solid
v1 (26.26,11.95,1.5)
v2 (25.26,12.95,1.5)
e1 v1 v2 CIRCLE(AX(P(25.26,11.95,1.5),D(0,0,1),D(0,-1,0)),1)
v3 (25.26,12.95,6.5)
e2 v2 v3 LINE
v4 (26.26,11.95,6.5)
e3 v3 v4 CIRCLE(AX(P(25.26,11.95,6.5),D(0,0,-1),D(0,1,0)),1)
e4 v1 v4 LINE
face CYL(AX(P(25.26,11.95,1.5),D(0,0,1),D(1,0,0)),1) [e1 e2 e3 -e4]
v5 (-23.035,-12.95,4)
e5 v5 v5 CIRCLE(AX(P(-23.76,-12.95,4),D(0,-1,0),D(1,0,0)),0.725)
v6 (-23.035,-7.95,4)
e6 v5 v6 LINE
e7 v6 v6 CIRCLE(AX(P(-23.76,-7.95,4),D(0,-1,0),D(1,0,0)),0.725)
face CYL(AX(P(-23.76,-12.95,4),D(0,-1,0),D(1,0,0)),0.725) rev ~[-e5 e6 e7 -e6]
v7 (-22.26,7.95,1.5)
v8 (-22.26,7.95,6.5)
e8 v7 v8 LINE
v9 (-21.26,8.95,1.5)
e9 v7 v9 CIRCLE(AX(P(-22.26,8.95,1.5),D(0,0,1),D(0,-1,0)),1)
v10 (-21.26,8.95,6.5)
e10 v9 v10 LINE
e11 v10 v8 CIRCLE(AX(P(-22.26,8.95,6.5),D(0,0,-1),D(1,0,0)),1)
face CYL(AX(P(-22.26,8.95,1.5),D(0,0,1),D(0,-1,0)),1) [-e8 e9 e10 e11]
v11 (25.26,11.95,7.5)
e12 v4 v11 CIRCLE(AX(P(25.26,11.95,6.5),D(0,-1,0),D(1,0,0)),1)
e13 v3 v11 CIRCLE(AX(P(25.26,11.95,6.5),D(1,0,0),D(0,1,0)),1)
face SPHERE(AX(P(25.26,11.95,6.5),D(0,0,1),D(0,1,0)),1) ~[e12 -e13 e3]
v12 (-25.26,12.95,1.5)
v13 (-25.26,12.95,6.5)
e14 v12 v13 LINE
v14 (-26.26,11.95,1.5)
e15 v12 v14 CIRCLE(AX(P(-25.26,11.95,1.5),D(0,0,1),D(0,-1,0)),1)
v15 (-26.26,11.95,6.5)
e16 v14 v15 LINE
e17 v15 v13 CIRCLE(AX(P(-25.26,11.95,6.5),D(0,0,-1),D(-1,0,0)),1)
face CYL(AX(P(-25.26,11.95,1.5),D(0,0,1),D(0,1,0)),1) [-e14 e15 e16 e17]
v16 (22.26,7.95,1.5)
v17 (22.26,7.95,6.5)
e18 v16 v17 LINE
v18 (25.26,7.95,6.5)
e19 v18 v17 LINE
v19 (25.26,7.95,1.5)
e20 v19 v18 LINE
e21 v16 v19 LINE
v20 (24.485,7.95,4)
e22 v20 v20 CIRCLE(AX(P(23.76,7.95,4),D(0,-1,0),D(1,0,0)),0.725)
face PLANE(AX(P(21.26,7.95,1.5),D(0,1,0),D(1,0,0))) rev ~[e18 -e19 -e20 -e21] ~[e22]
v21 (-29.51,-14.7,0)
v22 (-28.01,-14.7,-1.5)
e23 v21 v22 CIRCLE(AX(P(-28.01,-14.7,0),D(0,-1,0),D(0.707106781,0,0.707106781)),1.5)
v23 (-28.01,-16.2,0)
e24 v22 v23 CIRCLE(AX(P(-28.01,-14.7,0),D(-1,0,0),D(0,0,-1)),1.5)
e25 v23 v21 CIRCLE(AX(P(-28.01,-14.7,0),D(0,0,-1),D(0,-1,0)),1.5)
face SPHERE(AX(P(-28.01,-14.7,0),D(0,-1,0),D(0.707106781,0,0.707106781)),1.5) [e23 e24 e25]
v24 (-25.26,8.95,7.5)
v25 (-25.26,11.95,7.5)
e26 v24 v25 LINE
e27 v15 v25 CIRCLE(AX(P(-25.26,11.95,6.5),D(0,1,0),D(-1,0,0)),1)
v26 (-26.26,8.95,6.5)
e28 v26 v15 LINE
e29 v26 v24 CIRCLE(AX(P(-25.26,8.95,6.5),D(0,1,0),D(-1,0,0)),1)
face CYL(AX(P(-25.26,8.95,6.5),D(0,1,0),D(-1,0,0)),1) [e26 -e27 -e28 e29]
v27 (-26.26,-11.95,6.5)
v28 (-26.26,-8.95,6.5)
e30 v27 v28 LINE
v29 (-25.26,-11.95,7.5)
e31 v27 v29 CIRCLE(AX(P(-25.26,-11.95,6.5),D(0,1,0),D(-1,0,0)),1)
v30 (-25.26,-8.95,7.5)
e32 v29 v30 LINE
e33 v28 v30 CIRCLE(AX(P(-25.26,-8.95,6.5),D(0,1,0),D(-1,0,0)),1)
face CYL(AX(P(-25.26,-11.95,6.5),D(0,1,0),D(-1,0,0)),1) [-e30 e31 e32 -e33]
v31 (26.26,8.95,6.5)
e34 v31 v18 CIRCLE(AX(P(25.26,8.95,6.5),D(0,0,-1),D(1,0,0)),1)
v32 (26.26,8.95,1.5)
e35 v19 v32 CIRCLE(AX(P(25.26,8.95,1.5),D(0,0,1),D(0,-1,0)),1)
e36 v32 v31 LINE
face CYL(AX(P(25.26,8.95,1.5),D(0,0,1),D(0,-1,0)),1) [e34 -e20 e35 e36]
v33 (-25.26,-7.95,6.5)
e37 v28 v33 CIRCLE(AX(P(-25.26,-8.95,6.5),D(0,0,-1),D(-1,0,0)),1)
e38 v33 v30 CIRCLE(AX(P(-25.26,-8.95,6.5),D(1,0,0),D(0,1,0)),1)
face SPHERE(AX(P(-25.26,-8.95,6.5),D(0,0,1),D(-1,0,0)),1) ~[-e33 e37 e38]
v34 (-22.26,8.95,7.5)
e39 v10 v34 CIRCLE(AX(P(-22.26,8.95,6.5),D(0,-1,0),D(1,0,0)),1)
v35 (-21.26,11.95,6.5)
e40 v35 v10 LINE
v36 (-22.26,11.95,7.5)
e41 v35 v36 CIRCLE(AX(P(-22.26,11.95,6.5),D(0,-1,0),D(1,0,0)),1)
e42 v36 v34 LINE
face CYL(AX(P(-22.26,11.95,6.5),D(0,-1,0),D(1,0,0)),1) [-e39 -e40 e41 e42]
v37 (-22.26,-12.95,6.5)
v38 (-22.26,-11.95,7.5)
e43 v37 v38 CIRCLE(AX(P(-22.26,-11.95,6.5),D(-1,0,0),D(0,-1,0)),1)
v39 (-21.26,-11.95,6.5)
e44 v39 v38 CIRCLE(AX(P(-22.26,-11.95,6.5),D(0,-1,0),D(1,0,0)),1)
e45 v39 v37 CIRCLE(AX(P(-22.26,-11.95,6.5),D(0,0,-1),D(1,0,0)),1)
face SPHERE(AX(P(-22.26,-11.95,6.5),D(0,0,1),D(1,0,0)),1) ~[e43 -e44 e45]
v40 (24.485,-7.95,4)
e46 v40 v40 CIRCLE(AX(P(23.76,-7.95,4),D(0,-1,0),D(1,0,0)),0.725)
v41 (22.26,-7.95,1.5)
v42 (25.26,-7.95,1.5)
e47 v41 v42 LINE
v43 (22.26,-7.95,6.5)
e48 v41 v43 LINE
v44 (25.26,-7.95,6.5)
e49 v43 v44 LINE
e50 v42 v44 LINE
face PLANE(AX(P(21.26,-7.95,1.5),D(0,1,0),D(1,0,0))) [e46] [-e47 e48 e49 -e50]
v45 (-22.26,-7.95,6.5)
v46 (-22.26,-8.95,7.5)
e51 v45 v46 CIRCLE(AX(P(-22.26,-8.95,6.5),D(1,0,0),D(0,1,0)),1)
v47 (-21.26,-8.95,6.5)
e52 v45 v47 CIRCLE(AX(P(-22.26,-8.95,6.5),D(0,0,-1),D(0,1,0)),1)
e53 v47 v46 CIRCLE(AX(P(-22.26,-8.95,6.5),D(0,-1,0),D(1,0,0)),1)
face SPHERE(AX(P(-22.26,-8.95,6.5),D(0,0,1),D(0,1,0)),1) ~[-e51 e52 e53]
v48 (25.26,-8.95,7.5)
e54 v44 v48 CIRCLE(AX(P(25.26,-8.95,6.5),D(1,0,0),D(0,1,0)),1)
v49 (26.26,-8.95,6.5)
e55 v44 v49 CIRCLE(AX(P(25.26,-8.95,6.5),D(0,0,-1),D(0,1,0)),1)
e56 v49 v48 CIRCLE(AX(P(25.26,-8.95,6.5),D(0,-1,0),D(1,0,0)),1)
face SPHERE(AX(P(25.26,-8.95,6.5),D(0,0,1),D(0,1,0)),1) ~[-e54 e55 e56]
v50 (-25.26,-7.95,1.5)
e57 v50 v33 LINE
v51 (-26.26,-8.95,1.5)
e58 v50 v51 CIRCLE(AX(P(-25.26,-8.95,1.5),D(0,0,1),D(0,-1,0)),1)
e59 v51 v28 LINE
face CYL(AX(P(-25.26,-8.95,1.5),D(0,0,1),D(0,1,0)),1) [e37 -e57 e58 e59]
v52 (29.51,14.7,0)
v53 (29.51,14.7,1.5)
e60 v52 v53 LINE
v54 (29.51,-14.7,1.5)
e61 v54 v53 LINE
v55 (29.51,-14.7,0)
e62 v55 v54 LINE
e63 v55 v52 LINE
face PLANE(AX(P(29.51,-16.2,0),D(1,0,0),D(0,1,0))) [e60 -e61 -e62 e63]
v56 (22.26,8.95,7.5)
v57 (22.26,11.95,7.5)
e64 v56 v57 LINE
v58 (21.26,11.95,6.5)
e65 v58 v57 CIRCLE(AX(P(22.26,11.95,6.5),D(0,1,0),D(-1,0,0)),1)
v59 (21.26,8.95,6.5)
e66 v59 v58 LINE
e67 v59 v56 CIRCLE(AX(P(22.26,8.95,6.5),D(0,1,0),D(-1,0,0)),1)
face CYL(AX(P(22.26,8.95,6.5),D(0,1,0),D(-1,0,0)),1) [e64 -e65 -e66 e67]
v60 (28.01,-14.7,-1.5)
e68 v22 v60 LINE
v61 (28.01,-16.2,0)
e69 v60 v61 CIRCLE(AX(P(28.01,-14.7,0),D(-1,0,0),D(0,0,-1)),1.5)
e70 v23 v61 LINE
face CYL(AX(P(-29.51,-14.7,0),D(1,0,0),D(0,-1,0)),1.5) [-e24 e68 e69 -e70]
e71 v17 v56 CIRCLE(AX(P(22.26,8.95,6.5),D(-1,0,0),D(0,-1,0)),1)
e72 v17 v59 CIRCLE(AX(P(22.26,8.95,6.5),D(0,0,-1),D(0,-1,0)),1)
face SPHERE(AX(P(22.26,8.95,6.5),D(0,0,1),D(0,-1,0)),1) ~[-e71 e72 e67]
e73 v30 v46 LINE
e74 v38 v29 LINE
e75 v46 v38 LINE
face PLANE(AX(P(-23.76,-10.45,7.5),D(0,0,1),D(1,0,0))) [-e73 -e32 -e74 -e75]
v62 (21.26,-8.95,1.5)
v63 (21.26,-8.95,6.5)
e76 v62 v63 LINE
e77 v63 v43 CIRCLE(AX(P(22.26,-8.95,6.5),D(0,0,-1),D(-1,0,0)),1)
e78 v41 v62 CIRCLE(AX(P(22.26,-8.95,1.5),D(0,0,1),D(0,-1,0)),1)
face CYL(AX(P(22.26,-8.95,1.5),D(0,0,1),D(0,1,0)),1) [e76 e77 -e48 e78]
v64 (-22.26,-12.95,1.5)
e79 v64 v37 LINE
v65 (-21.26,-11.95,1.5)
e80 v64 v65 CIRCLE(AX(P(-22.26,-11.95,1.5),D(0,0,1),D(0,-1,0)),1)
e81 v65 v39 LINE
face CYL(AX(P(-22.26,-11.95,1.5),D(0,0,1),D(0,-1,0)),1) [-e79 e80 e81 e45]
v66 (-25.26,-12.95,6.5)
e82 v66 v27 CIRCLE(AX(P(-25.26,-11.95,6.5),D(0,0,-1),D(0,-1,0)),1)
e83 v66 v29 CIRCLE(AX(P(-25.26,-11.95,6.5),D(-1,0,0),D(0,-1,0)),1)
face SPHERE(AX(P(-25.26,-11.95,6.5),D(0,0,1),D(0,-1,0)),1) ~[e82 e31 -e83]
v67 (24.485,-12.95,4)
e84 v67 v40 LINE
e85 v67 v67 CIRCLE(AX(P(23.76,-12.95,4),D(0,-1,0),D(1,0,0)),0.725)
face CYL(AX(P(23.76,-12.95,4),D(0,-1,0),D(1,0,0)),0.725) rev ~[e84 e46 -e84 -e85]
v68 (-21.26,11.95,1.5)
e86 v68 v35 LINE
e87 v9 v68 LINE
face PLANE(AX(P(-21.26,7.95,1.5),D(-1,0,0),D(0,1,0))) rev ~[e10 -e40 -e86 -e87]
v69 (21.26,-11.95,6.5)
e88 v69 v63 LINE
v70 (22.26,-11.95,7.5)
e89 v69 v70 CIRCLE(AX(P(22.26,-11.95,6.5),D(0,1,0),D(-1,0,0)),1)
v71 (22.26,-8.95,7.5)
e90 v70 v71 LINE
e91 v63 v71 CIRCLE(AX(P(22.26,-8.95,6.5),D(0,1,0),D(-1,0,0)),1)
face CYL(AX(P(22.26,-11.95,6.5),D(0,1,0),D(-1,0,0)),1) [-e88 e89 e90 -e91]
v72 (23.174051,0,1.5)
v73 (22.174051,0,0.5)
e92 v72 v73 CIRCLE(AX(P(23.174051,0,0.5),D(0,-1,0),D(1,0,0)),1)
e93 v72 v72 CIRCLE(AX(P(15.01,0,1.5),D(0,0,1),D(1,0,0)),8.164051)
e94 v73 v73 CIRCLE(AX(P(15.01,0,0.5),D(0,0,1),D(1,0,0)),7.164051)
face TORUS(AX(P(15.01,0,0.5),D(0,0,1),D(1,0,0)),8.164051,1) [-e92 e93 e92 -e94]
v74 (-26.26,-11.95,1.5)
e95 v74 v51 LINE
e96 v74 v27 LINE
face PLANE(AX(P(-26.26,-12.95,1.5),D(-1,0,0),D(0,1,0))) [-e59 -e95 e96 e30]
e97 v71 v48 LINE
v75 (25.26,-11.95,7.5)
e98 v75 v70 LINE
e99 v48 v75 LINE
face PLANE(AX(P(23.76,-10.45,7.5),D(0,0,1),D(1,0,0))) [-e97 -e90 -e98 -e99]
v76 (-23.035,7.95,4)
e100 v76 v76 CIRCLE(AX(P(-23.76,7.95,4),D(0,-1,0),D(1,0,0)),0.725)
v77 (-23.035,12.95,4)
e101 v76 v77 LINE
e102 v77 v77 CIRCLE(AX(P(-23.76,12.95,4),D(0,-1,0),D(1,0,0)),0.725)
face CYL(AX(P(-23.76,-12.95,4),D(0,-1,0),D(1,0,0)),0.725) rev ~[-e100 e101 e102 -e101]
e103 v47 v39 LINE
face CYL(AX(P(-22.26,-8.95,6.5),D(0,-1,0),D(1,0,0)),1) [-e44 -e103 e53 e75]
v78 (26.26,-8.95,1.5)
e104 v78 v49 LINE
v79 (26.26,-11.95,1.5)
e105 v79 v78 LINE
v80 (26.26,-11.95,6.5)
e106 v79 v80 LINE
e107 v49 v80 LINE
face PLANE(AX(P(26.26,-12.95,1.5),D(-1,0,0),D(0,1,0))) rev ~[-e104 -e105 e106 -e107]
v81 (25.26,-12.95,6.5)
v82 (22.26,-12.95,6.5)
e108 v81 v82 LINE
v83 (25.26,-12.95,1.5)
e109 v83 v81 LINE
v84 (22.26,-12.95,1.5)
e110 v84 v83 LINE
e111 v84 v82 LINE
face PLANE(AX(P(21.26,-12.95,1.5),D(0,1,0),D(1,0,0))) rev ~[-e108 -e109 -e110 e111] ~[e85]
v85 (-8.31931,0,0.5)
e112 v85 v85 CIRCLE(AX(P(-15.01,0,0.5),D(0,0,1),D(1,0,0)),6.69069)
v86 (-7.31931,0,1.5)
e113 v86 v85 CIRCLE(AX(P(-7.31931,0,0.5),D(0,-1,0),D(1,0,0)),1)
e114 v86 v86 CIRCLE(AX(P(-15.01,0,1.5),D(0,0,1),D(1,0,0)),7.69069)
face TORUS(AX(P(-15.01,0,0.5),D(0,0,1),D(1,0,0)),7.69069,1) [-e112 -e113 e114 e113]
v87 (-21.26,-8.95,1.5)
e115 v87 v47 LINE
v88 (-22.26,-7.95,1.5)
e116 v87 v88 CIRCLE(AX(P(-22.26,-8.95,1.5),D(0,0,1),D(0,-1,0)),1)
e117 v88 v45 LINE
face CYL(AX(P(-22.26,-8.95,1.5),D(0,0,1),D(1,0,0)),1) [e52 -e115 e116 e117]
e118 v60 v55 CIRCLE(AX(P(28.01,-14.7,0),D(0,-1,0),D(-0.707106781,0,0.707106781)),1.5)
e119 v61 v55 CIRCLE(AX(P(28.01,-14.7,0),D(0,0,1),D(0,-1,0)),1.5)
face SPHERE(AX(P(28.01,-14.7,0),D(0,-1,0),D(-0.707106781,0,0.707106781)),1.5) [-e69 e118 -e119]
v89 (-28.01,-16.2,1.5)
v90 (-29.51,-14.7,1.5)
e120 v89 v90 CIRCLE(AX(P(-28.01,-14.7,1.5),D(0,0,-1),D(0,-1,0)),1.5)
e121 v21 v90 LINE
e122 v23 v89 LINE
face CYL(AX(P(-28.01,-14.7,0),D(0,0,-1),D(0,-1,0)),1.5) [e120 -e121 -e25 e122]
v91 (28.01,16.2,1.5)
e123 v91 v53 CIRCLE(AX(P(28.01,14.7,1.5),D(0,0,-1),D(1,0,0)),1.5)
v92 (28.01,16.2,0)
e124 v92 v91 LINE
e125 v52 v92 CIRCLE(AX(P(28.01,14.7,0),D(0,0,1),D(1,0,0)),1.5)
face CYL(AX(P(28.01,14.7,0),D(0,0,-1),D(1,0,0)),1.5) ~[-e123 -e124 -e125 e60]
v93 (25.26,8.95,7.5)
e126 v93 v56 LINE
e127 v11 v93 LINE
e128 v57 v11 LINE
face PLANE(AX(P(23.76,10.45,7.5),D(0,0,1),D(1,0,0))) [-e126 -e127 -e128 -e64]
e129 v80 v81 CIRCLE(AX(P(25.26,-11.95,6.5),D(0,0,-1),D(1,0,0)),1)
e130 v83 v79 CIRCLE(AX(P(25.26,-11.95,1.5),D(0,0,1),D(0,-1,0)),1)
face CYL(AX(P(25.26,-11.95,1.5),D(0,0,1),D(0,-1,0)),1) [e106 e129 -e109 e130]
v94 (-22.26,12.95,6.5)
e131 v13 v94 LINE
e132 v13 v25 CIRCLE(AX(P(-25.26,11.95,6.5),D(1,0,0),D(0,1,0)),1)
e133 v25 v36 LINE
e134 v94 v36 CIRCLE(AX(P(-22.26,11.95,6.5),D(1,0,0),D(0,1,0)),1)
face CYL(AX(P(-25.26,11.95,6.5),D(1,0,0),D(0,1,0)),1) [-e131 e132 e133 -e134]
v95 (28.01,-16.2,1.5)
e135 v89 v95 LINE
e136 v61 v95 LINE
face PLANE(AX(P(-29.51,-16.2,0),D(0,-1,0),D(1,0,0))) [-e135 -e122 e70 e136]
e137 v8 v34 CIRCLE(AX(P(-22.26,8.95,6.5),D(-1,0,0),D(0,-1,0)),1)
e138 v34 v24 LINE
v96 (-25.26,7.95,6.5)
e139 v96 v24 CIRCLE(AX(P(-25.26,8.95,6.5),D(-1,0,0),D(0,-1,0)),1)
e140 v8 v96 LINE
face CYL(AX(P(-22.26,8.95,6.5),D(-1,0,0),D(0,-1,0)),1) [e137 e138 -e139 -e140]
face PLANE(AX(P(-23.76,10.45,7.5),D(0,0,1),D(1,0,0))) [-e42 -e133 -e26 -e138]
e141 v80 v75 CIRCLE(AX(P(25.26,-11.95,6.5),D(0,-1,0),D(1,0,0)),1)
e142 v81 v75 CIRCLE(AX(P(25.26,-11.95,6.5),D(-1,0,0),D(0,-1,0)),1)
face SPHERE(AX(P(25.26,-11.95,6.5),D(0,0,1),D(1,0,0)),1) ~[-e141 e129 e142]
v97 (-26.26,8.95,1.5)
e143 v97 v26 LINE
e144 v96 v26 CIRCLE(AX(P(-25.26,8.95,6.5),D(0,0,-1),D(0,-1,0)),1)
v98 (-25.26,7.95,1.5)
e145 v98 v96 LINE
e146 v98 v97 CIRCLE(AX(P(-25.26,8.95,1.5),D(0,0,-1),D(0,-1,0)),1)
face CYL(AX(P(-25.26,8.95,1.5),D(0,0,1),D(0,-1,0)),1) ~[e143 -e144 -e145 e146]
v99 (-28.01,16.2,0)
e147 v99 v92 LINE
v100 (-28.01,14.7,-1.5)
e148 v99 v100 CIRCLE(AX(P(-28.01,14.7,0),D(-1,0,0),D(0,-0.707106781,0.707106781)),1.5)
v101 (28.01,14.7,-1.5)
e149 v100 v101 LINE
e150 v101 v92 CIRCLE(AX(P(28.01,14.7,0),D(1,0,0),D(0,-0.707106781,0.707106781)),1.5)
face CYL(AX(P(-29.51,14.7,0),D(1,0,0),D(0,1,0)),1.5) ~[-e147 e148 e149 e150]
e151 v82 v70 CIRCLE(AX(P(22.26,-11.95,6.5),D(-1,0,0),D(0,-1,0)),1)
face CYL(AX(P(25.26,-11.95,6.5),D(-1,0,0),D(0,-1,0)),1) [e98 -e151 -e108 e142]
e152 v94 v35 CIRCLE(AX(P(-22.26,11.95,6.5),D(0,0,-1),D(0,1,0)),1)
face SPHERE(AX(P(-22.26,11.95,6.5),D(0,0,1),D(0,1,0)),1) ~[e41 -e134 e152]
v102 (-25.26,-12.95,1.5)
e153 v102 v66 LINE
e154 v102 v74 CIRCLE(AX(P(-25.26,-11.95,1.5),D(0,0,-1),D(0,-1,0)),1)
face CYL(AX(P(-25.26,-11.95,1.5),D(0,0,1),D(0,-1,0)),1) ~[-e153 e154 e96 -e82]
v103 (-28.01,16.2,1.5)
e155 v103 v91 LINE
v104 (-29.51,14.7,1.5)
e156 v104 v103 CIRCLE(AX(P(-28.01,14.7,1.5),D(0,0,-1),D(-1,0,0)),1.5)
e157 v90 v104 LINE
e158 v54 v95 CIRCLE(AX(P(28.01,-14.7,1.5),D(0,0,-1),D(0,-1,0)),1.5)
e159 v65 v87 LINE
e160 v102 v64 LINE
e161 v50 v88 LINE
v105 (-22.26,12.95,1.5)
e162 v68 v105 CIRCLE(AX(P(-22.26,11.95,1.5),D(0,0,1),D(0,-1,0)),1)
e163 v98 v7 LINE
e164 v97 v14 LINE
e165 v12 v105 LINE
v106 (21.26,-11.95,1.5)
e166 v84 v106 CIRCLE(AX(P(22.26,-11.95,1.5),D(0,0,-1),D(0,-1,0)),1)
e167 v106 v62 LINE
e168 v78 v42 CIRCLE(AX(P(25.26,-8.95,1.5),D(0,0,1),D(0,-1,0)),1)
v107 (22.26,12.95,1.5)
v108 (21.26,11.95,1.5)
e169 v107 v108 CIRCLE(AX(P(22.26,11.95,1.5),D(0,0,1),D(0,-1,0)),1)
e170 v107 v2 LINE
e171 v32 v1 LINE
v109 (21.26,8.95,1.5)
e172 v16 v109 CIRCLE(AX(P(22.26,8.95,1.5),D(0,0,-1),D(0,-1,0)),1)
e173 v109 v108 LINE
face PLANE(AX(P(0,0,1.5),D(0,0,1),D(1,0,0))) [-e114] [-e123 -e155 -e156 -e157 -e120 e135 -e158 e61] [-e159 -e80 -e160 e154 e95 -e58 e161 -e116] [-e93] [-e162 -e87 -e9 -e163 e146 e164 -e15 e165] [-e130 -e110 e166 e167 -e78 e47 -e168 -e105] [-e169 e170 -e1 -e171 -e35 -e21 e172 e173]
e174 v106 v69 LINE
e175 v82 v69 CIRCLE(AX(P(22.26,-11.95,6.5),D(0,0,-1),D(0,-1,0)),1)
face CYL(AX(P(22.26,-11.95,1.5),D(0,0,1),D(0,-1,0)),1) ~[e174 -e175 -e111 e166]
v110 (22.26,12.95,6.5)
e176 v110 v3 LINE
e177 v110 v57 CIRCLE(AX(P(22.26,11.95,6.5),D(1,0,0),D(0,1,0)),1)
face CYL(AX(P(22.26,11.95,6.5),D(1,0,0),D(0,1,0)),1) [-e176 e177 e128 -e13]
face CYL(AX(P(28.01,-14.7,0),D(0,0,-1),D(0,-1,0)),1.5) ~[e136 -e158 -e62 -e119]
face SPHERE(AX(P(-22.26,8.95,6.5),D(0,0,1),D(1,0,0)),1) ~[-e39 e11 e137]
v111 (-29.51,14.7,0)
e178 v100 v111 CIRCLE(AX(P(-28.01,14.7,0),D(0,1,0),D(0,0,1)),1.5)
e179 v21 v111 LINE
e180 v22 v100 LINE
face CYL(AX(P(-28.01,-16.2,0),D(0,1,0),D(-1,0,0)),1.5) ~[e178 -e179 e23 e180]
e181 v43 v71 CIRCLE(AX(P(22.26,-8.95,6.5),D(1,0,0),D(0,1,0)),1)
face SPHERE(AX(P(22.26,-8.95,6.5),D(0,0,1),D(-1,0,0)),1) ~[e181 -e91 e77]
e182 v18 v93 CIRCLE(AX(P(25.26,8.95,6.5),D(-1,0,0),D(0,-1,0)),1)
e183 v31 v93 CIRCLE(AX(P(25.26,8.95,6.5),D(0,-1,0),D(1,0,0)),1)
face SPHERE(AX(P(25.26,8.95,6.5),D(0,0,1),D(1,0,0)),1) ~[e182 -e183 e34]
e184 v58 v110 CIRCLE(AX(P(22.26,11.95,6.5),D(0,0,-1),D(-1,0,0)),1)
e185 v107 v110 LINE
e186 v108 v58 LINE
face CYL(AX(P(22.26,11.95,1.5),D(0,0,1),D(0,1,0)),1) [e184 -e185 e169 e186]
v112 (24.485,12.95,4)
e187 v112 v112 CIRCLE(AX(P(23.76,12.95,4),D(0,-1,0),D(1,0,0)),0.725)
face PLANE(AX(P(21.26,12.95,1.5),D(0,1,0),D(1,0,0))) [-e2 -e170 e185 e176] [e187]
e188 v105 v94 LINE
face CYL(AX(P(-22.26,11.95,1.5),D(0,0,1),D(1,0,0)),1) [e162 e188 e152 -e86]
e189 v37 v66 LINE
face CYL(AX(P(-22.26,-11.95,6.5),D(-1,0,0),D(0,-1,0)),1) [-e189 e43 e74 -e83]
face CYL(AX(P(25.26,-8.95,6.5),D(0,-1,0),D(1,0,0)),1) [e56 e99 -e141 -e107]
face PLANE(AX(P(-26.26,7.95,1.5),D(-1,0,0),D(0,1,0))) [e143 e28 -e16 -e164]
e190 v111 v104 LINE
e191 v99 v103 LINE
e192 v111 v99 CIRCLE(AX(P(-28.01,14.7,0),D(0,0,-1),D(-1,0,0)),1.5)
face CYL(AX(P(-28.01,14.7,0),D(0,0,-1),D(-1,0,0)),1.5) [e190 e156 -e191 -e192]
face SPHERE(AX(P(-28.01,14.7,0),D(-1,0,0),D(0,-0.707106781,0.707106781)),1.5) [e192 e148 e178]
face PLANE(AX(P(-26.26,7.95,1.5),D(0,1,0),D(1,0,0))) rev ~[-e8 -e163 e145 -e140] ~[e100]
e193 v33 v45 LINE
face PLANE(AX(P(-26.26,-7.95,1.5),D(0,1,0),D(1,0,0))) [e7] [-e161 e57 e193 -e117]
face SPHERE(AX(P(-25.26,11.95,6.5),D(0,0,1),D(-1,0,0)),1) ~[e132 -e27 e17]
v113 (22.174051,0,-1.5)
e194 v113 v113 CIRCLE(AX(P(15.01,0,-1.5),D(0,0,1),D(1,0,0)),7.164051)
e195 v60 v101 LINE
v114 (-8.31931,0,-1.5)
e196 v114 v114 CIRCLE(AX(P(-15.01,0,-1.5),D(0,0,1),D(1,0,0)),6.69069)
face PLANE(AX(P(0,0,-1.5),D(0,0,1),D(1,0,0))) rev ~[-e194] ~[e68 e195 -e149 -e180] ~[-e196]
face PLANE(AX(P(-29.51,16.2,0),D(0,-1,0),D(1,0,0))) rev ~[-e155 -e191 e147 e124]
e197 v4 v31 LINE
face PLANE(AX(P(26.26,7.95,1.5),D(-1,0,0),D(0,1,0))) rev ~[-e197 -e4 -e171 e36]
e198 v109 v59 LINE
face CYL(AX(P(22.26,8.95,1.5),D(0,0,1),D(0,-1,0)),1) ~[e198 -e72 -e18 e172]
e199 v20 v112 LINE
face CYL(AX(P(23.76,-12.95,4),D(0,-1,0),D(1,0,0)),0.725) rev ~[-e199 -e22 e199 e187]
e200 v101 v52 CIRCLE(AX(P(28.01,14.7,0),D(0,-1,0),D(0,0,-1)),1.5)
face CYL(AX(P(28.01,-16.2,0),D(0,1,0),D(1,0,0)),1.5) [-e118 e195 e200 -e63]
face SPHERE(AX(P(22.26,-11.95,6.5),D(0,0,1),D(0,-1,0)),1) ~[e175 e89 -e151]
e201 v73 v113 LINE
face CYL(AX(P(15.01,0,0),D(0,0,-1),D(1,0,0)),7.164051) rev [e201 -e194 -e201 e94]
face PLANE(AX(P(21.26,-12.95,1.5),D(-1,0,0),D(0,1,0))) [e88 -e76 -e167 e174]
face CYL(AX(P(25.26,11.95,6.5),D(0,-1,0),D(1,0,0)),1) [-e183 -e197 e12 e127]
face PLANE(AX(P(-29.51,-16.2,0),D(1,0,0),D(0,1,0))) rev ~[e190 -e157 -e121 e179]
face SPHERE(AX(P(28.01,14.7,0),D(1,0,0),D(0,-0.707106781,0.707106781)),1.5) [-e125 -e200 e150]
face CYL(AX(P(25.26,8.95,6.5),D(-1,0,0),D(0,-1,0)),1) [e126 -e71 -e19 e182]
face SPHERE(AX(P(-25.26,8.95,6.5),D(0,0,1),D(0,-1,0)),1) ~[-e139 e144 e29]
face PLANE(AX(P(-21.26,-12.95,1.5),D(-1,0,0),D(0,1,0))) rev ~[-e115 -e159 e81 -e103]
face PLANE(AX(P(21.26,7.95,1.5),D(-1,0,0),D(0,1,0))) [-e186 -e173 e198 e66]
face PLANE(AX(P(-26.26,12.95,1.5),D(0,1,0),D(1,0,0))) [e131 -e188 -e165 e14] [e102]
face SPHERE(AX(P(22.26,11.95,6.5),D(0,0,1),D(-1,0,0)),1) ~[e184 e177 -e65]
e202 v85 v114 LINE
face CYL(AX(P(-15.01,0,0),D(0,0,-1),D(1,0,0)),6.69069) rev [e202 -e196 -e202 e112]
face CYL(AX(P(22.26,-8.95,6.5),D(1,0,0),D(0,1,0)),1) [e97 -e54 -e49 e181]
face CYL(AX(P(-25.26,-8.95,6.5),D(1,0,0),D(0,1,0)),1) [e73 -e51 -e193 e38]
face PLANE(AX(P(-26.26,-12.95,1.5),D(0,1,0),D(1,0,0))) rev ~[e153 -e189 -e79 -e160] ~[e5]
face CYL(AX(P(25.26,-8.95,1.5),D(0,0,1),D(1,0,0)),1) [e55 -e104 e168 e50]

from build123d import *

# Parameters (mm, degrees)
F0_W         = 59.02
F0_H         = 32.4
F0_R         = 6.6906896399
F0_R_2       = 7.1640506352
F1_DEPTH     = 1.5
F2_W         = 5
F2_H         = 5
F3_DEPTH     = 6
F4_R         = 1
F5_R         = 1
F6_R         = 1.5
F7_T1_DEPTH  = 5.25
F7_S5_W      = 1.5
F7_S5_H      = 1.5
F7_T6_DEPTH  = 1.5
F7_S11_W     = 1.5
F7_S11_H     = 1.5
F7_T12_DEPTH = 1.5
F7_S17_W     = 1.5
F7_S17_H     = 1.5
F7_T18_DEPTH = 1.5
F7_S23_W     = 1.5
F7_S23_H     = 1.5
F7_T24_DEPTH = 1.5
F8_R         = 0.725
F9_DEPTH     = 35
F10_R        = 0.725
F11_DEPTH    = 35


# Not quite as in the source:
# - a fillet or chamfer that OpenCascade refuses, or shapes differently, is made with other operations: its cross-section is extruded or revolved along the edge and cut away or added


with BuildPart() as f1:
    # F0 (on Top) → F1 (new body, symmetric)
    with BuildSketch(Plane.XY):
        Rectangle(F0_W, F0_H)
        with Locations((-15.01, 0)):
            Circle(F0_R, mode=Mode.SUBTRACT)
        with Locations((15.01, 0)):
            Circle(F0_R_2, mode=Mode.SUBTRACT)
    extrude(amount=F1_DEPTH, both=True)

    # F2 (on face) → F3 (join)
    with BuildSketch(Plane.XY.offset(1.5)):
        with Locations((-23.76, -10.45)):
            Rectangle(F2_W, F2_H)
        with Locations((-23.76, 10.45)):
            Rectangle(F2_W, F2_H)
        with Locations((23.76, 10.45)):
            Rectangle(F2_W, F2_H)
        with Locations((23.76, -10.45)):
            Rectangle(F2_W, F2_H)
    extrude(amount=F3_DEPTH)

    # F4
    f4_edges = [f1.edges().sort_by_distance(p)[0] for p in [
        (26.26, -12.95, 4.5),
        (26.26, -7.95, 4.5),
        (26.26, 7.95, 4.5),
        (26.26, 12.95, 4.5),
        (21.26, -12.95, 4.5),
        (21.26, -7.95, 4.5),
        (-21.26, -12.95, 4.5),
        (-26.26, -12.95, 4.5),
        (-26.26, -7.95, 4.5),
        (-26.26, 7.95, 4.5),
        (-21.26, 7.95, 4.5),
        (21.26, 12.95, 4.5),
        (21.26, 7.95, 4.5),
        (-26.26, 12.95, 4.5),
        (-21.26, 12.95, 4.5),
        (-21.26, -7.95, 4.5),
    ]]
    fillet(f4_edges, radius=F4_R)

    # F5
    f5_edges = [f1.edges().sort_by_distance(p)[0] for p in [
        (-23.76, -7.95, 7.5),
        (-21.552893, -8.242893, 7.5),
        (-25.967107, -8.242893, 7.5),
        (-21.26, -10.45, 7.5),
        (-26.26, -10.45, 7.5),
        (-21.552893, -12.657107, 7.5),
        (-25.967107, -12.657107, 7.5),
        (-23.76, -12.95, 7.5),
        (-23.76, 12.95, 7.5),
        (-21.552893, 12.657107, 7.5),
        (-25.967107, 12.657107, 7.5),
        (-21.26, 10.45, 7.5),
        (-26.26, 10.45, 7.5),
        (-21.552893, 8.242893, 7.5),
        (-25.967107, 8.242893, 7.5),
        (-23.76, 7.95, 7.5),
        (23.76, 12.95, 7.5),
        (25.967107, 12.657107, 7.5),
        (21.552893, 12.657107, 7.5),
        (26.26, 10.45, 7.5),
        (21.26, 10.45, 7.5),
        (25.967107, 8.242893, 7.5),
        (21.552893, 8.242893, 7.5),
        (23.76, 7.95, 7.5),
        (23.76, -7.95, 7.5),
        (25.967107, -8.242893, 7.5),
        (21.552893, -8.242893, 7.5),
        (26.26, -10.45, 7.5),
        (21.26, -10.45, 7.5),
        (25.967107, -12.657107, 7.5),
        (21.552893, -12.657107, 7.5),
        (23.76, -12.95, 7.5),
        (7.845949, 0, 1.5),
        (-21.70069, 0, 1.5),
    ]]
    fillet(f5_edges, radius=F5_R)

    # F6
    f6_edges = [f1.edges().sort_by_distance(p)[0] for p in [
        (0, 16.2, -1.5),
        (-29.51, 0, -1.5),
        (0, -16.2, -1.5),
        (29.51, 0, -1.5),
    ]]
    fillet(f6_edges, radius=F6_R)

    # F7: fillet of radius 1.5 on 4 edges, made by hand

    # F7_s2 → F7_t1 (cut)
    with BuildSketch(Plane.XY):
        with BuildLine():
            ThreePointArc((29.51, 14.7), (29.0706601718, 15.7606601718), (28.01, 16.2))
            Line((28.01, 16.2), (29.51, 16.2))
            Line((29.51, 16.2), (29.51, 14.7))
        make_face()
        with BuildLine():
            ThreePointArc((-29.51, 14.7), (-29.0706601718, 15.7606601718), (-28.01, 16.2))
            Line((-28.01, 16.2), (-29.51, 16.2))
            Line((-29.51, 16.2), (-29.51, 14.7))
        make_face()
        with BuildLine():
            ThreePointArc((-28.01, -16.2), (-29.0706601718, -15.7606601718), (-29.51, -14.7))
            Line((-29.51, -14.7), (-29.51, -16.2))
            Line((-29.51, -16.2), (-28.01, -16.2))
        make_face()
        with BuildLine():
            ThreePointArc((28.01, -16.2), (29.0706601718, -15.7606601718), (29.51, -14.7))
            Line((29.51, -14.7), (29.51, -16.2))
            Line((29.51, -16.2), (28.01, -16.2))
        make_face()
    extrude(amount=F7_T1_DEPTH, mode=Mode.SUBTRACT)


with BuildPart() as f7_tool4:
    # F7_s5 → F7_t6 (new body)
    with BuildSketch(Plane.XZ.offset(14.7)):
        with Locations((28.76, -0.75)):
            Rectangle(F7_S5_W, F7_S5_H)
    extrude(amount=F7_T6_DEPTH)

    # F7_s7 → F7_t8 (revolve, cut)
    with BuildSketch(Plane(origin=(28.01, -14.7, 0), x_dir=(-0.7071067812, 0, 0.7071067812), z_dir=(0.7071067812, 0, 0.7071067812))):
        with BuildLine():
            ThreePointArc((0, -1.5), (1.5, 0), (0, 1.5))
            Line((0, 1.5), (0, -1.5))
        make_face()
    revolve(axis=Axis((28.01, -14.7, 0), (0, -1, 0)), mode=Mode.SUBTRACT)


with BuildPart() as f1_1:
    add(f1.part)

    # F7_t3: cut F7_tool4
    add(f7_tool4.part, mode=Mode.SUBTRACT)


with BuildPart() as f7_tool10:
    # F7_s11 → F7_t12 (new body)
    with BuildSketch(Plane.XZ.offset(14.7)):
        with Locations((-28.76, -0.75)):
            Rectangle(F7_S11_W, F7_S11_H)
    extrude(amount=F7_T12_DEPTH)

    # F7_s13 → F7_t14 (revolve, cut)
    with BuildSketch(Plane(origin=(-28.01, -14.7, 0), x_dir=(0.7071067812, 0, 0.7071067812), z_dir=(0.7071067812, 0, -0.7071067812))):
        with BuildLine():
            ThreePointArc((0, -1.5), (1.5, 0), (0, 1.5))
            Line((0, 1.5), (0, -1.5))
        make_face()
    revolve(axis=Axis((-28.01, -14.7, 0), (0, -1, 0)), mode=Mode.SUBTRACT)


with BuildPart() as f1_2:
    add(f1_1.part)

    # F7_t9: cut F7_tool10
    add(f7_tool10.part, mode=Mode.SUBTRACT)


with BuildPart() as f7_tool16:
    # F7_s17 → F7_t18 (new body)
    with BuildSketch(Plane.YZ.offset(-28.01)):
        with Locations((15.45, -0.75)):
            Rectangle(F7_S17_W, F7_S17_H)
    extrude(amount=-F7_T18_DEPTH)

    # F7_s19 → F7_t20 (revolve, cut)
    with BuildSketch(Plane(origin=(-28.01, 14.7, 0), x_dir=(0, -0.7071067812, 0.7071067812), z_dir=(0, -0.7071067812, -0.7071067812))):
        with BuildLine():
            ThreePointArc((0, -1.5), (1.5, 0), (0, 1.5))
            Line((0, 1.5), (0, -1.5))
        make_face()
    revolve(axis=Axis((-28.01, 14.7, 0), (-1, 0, 0)), mode=Mode.SUBTRACT)


with BuildPart() as f1_3:
    add(f1_2.part)

    # F7_t15: cut F7_tool16
    add(f7_tool16.part, mode=Mode.SUBTRACT)


with BuildPart() as f7_tool22:
    # F7_s23 → F7_t24 (new body)
    with BuildSketch(Plane.YZ.offset(28.01)):
        with Locations((15.45, -0.75)):
            Rectangle(F7_S23_W, F7_S23_H)
    extrude(amount=F7_T24_DEPTH)

    # F7_s25 → F7_t26 (revolve, cut)
    with BuildSketch(Plane(origin=(28.01, 14.7, 0), x_dir=(0, -0.7071067812, 0.7071067812), z_dir=(0, 0.7071067812, 0.7071067812))):
        with BuildLine():
            ThreePointArc((0, -1.5), (1.5, 0), (0, 1.5))
            Line((0, 1.5), (0, -1.5))
        make_face()
    revolve(axis=Axis((28.01, 14.7, 0), (1, 0, 0)), mode=Mode.SUBTRACT)


with BuildPart() as f1_4:
    add(f1_3.part)

    # F7_t21: cut F7_tool22
    add(f7_tool22.part, mode=Mode.SUBTRACT)

    # F8 (on face) → F9 (cut)
    with BuildSketch(Plane.XZ.offset(12.95)):
        with Locations((23.76, 4)):
            Circle(F8_R)
    extrude(amount=-F9_DEPTH, mode=Mode.SUBTRACT)

    # F10 (on face) → F11 (cut)
    with BuildSketch(Plane.XZ.offset(12.95)):
        with Locations((-23.76, 4)):
            Circle(F10_R)
    extrude(amount=-F11_DEPTH, mode=Mode.SUBTRACT)


solid = f1_4.part
